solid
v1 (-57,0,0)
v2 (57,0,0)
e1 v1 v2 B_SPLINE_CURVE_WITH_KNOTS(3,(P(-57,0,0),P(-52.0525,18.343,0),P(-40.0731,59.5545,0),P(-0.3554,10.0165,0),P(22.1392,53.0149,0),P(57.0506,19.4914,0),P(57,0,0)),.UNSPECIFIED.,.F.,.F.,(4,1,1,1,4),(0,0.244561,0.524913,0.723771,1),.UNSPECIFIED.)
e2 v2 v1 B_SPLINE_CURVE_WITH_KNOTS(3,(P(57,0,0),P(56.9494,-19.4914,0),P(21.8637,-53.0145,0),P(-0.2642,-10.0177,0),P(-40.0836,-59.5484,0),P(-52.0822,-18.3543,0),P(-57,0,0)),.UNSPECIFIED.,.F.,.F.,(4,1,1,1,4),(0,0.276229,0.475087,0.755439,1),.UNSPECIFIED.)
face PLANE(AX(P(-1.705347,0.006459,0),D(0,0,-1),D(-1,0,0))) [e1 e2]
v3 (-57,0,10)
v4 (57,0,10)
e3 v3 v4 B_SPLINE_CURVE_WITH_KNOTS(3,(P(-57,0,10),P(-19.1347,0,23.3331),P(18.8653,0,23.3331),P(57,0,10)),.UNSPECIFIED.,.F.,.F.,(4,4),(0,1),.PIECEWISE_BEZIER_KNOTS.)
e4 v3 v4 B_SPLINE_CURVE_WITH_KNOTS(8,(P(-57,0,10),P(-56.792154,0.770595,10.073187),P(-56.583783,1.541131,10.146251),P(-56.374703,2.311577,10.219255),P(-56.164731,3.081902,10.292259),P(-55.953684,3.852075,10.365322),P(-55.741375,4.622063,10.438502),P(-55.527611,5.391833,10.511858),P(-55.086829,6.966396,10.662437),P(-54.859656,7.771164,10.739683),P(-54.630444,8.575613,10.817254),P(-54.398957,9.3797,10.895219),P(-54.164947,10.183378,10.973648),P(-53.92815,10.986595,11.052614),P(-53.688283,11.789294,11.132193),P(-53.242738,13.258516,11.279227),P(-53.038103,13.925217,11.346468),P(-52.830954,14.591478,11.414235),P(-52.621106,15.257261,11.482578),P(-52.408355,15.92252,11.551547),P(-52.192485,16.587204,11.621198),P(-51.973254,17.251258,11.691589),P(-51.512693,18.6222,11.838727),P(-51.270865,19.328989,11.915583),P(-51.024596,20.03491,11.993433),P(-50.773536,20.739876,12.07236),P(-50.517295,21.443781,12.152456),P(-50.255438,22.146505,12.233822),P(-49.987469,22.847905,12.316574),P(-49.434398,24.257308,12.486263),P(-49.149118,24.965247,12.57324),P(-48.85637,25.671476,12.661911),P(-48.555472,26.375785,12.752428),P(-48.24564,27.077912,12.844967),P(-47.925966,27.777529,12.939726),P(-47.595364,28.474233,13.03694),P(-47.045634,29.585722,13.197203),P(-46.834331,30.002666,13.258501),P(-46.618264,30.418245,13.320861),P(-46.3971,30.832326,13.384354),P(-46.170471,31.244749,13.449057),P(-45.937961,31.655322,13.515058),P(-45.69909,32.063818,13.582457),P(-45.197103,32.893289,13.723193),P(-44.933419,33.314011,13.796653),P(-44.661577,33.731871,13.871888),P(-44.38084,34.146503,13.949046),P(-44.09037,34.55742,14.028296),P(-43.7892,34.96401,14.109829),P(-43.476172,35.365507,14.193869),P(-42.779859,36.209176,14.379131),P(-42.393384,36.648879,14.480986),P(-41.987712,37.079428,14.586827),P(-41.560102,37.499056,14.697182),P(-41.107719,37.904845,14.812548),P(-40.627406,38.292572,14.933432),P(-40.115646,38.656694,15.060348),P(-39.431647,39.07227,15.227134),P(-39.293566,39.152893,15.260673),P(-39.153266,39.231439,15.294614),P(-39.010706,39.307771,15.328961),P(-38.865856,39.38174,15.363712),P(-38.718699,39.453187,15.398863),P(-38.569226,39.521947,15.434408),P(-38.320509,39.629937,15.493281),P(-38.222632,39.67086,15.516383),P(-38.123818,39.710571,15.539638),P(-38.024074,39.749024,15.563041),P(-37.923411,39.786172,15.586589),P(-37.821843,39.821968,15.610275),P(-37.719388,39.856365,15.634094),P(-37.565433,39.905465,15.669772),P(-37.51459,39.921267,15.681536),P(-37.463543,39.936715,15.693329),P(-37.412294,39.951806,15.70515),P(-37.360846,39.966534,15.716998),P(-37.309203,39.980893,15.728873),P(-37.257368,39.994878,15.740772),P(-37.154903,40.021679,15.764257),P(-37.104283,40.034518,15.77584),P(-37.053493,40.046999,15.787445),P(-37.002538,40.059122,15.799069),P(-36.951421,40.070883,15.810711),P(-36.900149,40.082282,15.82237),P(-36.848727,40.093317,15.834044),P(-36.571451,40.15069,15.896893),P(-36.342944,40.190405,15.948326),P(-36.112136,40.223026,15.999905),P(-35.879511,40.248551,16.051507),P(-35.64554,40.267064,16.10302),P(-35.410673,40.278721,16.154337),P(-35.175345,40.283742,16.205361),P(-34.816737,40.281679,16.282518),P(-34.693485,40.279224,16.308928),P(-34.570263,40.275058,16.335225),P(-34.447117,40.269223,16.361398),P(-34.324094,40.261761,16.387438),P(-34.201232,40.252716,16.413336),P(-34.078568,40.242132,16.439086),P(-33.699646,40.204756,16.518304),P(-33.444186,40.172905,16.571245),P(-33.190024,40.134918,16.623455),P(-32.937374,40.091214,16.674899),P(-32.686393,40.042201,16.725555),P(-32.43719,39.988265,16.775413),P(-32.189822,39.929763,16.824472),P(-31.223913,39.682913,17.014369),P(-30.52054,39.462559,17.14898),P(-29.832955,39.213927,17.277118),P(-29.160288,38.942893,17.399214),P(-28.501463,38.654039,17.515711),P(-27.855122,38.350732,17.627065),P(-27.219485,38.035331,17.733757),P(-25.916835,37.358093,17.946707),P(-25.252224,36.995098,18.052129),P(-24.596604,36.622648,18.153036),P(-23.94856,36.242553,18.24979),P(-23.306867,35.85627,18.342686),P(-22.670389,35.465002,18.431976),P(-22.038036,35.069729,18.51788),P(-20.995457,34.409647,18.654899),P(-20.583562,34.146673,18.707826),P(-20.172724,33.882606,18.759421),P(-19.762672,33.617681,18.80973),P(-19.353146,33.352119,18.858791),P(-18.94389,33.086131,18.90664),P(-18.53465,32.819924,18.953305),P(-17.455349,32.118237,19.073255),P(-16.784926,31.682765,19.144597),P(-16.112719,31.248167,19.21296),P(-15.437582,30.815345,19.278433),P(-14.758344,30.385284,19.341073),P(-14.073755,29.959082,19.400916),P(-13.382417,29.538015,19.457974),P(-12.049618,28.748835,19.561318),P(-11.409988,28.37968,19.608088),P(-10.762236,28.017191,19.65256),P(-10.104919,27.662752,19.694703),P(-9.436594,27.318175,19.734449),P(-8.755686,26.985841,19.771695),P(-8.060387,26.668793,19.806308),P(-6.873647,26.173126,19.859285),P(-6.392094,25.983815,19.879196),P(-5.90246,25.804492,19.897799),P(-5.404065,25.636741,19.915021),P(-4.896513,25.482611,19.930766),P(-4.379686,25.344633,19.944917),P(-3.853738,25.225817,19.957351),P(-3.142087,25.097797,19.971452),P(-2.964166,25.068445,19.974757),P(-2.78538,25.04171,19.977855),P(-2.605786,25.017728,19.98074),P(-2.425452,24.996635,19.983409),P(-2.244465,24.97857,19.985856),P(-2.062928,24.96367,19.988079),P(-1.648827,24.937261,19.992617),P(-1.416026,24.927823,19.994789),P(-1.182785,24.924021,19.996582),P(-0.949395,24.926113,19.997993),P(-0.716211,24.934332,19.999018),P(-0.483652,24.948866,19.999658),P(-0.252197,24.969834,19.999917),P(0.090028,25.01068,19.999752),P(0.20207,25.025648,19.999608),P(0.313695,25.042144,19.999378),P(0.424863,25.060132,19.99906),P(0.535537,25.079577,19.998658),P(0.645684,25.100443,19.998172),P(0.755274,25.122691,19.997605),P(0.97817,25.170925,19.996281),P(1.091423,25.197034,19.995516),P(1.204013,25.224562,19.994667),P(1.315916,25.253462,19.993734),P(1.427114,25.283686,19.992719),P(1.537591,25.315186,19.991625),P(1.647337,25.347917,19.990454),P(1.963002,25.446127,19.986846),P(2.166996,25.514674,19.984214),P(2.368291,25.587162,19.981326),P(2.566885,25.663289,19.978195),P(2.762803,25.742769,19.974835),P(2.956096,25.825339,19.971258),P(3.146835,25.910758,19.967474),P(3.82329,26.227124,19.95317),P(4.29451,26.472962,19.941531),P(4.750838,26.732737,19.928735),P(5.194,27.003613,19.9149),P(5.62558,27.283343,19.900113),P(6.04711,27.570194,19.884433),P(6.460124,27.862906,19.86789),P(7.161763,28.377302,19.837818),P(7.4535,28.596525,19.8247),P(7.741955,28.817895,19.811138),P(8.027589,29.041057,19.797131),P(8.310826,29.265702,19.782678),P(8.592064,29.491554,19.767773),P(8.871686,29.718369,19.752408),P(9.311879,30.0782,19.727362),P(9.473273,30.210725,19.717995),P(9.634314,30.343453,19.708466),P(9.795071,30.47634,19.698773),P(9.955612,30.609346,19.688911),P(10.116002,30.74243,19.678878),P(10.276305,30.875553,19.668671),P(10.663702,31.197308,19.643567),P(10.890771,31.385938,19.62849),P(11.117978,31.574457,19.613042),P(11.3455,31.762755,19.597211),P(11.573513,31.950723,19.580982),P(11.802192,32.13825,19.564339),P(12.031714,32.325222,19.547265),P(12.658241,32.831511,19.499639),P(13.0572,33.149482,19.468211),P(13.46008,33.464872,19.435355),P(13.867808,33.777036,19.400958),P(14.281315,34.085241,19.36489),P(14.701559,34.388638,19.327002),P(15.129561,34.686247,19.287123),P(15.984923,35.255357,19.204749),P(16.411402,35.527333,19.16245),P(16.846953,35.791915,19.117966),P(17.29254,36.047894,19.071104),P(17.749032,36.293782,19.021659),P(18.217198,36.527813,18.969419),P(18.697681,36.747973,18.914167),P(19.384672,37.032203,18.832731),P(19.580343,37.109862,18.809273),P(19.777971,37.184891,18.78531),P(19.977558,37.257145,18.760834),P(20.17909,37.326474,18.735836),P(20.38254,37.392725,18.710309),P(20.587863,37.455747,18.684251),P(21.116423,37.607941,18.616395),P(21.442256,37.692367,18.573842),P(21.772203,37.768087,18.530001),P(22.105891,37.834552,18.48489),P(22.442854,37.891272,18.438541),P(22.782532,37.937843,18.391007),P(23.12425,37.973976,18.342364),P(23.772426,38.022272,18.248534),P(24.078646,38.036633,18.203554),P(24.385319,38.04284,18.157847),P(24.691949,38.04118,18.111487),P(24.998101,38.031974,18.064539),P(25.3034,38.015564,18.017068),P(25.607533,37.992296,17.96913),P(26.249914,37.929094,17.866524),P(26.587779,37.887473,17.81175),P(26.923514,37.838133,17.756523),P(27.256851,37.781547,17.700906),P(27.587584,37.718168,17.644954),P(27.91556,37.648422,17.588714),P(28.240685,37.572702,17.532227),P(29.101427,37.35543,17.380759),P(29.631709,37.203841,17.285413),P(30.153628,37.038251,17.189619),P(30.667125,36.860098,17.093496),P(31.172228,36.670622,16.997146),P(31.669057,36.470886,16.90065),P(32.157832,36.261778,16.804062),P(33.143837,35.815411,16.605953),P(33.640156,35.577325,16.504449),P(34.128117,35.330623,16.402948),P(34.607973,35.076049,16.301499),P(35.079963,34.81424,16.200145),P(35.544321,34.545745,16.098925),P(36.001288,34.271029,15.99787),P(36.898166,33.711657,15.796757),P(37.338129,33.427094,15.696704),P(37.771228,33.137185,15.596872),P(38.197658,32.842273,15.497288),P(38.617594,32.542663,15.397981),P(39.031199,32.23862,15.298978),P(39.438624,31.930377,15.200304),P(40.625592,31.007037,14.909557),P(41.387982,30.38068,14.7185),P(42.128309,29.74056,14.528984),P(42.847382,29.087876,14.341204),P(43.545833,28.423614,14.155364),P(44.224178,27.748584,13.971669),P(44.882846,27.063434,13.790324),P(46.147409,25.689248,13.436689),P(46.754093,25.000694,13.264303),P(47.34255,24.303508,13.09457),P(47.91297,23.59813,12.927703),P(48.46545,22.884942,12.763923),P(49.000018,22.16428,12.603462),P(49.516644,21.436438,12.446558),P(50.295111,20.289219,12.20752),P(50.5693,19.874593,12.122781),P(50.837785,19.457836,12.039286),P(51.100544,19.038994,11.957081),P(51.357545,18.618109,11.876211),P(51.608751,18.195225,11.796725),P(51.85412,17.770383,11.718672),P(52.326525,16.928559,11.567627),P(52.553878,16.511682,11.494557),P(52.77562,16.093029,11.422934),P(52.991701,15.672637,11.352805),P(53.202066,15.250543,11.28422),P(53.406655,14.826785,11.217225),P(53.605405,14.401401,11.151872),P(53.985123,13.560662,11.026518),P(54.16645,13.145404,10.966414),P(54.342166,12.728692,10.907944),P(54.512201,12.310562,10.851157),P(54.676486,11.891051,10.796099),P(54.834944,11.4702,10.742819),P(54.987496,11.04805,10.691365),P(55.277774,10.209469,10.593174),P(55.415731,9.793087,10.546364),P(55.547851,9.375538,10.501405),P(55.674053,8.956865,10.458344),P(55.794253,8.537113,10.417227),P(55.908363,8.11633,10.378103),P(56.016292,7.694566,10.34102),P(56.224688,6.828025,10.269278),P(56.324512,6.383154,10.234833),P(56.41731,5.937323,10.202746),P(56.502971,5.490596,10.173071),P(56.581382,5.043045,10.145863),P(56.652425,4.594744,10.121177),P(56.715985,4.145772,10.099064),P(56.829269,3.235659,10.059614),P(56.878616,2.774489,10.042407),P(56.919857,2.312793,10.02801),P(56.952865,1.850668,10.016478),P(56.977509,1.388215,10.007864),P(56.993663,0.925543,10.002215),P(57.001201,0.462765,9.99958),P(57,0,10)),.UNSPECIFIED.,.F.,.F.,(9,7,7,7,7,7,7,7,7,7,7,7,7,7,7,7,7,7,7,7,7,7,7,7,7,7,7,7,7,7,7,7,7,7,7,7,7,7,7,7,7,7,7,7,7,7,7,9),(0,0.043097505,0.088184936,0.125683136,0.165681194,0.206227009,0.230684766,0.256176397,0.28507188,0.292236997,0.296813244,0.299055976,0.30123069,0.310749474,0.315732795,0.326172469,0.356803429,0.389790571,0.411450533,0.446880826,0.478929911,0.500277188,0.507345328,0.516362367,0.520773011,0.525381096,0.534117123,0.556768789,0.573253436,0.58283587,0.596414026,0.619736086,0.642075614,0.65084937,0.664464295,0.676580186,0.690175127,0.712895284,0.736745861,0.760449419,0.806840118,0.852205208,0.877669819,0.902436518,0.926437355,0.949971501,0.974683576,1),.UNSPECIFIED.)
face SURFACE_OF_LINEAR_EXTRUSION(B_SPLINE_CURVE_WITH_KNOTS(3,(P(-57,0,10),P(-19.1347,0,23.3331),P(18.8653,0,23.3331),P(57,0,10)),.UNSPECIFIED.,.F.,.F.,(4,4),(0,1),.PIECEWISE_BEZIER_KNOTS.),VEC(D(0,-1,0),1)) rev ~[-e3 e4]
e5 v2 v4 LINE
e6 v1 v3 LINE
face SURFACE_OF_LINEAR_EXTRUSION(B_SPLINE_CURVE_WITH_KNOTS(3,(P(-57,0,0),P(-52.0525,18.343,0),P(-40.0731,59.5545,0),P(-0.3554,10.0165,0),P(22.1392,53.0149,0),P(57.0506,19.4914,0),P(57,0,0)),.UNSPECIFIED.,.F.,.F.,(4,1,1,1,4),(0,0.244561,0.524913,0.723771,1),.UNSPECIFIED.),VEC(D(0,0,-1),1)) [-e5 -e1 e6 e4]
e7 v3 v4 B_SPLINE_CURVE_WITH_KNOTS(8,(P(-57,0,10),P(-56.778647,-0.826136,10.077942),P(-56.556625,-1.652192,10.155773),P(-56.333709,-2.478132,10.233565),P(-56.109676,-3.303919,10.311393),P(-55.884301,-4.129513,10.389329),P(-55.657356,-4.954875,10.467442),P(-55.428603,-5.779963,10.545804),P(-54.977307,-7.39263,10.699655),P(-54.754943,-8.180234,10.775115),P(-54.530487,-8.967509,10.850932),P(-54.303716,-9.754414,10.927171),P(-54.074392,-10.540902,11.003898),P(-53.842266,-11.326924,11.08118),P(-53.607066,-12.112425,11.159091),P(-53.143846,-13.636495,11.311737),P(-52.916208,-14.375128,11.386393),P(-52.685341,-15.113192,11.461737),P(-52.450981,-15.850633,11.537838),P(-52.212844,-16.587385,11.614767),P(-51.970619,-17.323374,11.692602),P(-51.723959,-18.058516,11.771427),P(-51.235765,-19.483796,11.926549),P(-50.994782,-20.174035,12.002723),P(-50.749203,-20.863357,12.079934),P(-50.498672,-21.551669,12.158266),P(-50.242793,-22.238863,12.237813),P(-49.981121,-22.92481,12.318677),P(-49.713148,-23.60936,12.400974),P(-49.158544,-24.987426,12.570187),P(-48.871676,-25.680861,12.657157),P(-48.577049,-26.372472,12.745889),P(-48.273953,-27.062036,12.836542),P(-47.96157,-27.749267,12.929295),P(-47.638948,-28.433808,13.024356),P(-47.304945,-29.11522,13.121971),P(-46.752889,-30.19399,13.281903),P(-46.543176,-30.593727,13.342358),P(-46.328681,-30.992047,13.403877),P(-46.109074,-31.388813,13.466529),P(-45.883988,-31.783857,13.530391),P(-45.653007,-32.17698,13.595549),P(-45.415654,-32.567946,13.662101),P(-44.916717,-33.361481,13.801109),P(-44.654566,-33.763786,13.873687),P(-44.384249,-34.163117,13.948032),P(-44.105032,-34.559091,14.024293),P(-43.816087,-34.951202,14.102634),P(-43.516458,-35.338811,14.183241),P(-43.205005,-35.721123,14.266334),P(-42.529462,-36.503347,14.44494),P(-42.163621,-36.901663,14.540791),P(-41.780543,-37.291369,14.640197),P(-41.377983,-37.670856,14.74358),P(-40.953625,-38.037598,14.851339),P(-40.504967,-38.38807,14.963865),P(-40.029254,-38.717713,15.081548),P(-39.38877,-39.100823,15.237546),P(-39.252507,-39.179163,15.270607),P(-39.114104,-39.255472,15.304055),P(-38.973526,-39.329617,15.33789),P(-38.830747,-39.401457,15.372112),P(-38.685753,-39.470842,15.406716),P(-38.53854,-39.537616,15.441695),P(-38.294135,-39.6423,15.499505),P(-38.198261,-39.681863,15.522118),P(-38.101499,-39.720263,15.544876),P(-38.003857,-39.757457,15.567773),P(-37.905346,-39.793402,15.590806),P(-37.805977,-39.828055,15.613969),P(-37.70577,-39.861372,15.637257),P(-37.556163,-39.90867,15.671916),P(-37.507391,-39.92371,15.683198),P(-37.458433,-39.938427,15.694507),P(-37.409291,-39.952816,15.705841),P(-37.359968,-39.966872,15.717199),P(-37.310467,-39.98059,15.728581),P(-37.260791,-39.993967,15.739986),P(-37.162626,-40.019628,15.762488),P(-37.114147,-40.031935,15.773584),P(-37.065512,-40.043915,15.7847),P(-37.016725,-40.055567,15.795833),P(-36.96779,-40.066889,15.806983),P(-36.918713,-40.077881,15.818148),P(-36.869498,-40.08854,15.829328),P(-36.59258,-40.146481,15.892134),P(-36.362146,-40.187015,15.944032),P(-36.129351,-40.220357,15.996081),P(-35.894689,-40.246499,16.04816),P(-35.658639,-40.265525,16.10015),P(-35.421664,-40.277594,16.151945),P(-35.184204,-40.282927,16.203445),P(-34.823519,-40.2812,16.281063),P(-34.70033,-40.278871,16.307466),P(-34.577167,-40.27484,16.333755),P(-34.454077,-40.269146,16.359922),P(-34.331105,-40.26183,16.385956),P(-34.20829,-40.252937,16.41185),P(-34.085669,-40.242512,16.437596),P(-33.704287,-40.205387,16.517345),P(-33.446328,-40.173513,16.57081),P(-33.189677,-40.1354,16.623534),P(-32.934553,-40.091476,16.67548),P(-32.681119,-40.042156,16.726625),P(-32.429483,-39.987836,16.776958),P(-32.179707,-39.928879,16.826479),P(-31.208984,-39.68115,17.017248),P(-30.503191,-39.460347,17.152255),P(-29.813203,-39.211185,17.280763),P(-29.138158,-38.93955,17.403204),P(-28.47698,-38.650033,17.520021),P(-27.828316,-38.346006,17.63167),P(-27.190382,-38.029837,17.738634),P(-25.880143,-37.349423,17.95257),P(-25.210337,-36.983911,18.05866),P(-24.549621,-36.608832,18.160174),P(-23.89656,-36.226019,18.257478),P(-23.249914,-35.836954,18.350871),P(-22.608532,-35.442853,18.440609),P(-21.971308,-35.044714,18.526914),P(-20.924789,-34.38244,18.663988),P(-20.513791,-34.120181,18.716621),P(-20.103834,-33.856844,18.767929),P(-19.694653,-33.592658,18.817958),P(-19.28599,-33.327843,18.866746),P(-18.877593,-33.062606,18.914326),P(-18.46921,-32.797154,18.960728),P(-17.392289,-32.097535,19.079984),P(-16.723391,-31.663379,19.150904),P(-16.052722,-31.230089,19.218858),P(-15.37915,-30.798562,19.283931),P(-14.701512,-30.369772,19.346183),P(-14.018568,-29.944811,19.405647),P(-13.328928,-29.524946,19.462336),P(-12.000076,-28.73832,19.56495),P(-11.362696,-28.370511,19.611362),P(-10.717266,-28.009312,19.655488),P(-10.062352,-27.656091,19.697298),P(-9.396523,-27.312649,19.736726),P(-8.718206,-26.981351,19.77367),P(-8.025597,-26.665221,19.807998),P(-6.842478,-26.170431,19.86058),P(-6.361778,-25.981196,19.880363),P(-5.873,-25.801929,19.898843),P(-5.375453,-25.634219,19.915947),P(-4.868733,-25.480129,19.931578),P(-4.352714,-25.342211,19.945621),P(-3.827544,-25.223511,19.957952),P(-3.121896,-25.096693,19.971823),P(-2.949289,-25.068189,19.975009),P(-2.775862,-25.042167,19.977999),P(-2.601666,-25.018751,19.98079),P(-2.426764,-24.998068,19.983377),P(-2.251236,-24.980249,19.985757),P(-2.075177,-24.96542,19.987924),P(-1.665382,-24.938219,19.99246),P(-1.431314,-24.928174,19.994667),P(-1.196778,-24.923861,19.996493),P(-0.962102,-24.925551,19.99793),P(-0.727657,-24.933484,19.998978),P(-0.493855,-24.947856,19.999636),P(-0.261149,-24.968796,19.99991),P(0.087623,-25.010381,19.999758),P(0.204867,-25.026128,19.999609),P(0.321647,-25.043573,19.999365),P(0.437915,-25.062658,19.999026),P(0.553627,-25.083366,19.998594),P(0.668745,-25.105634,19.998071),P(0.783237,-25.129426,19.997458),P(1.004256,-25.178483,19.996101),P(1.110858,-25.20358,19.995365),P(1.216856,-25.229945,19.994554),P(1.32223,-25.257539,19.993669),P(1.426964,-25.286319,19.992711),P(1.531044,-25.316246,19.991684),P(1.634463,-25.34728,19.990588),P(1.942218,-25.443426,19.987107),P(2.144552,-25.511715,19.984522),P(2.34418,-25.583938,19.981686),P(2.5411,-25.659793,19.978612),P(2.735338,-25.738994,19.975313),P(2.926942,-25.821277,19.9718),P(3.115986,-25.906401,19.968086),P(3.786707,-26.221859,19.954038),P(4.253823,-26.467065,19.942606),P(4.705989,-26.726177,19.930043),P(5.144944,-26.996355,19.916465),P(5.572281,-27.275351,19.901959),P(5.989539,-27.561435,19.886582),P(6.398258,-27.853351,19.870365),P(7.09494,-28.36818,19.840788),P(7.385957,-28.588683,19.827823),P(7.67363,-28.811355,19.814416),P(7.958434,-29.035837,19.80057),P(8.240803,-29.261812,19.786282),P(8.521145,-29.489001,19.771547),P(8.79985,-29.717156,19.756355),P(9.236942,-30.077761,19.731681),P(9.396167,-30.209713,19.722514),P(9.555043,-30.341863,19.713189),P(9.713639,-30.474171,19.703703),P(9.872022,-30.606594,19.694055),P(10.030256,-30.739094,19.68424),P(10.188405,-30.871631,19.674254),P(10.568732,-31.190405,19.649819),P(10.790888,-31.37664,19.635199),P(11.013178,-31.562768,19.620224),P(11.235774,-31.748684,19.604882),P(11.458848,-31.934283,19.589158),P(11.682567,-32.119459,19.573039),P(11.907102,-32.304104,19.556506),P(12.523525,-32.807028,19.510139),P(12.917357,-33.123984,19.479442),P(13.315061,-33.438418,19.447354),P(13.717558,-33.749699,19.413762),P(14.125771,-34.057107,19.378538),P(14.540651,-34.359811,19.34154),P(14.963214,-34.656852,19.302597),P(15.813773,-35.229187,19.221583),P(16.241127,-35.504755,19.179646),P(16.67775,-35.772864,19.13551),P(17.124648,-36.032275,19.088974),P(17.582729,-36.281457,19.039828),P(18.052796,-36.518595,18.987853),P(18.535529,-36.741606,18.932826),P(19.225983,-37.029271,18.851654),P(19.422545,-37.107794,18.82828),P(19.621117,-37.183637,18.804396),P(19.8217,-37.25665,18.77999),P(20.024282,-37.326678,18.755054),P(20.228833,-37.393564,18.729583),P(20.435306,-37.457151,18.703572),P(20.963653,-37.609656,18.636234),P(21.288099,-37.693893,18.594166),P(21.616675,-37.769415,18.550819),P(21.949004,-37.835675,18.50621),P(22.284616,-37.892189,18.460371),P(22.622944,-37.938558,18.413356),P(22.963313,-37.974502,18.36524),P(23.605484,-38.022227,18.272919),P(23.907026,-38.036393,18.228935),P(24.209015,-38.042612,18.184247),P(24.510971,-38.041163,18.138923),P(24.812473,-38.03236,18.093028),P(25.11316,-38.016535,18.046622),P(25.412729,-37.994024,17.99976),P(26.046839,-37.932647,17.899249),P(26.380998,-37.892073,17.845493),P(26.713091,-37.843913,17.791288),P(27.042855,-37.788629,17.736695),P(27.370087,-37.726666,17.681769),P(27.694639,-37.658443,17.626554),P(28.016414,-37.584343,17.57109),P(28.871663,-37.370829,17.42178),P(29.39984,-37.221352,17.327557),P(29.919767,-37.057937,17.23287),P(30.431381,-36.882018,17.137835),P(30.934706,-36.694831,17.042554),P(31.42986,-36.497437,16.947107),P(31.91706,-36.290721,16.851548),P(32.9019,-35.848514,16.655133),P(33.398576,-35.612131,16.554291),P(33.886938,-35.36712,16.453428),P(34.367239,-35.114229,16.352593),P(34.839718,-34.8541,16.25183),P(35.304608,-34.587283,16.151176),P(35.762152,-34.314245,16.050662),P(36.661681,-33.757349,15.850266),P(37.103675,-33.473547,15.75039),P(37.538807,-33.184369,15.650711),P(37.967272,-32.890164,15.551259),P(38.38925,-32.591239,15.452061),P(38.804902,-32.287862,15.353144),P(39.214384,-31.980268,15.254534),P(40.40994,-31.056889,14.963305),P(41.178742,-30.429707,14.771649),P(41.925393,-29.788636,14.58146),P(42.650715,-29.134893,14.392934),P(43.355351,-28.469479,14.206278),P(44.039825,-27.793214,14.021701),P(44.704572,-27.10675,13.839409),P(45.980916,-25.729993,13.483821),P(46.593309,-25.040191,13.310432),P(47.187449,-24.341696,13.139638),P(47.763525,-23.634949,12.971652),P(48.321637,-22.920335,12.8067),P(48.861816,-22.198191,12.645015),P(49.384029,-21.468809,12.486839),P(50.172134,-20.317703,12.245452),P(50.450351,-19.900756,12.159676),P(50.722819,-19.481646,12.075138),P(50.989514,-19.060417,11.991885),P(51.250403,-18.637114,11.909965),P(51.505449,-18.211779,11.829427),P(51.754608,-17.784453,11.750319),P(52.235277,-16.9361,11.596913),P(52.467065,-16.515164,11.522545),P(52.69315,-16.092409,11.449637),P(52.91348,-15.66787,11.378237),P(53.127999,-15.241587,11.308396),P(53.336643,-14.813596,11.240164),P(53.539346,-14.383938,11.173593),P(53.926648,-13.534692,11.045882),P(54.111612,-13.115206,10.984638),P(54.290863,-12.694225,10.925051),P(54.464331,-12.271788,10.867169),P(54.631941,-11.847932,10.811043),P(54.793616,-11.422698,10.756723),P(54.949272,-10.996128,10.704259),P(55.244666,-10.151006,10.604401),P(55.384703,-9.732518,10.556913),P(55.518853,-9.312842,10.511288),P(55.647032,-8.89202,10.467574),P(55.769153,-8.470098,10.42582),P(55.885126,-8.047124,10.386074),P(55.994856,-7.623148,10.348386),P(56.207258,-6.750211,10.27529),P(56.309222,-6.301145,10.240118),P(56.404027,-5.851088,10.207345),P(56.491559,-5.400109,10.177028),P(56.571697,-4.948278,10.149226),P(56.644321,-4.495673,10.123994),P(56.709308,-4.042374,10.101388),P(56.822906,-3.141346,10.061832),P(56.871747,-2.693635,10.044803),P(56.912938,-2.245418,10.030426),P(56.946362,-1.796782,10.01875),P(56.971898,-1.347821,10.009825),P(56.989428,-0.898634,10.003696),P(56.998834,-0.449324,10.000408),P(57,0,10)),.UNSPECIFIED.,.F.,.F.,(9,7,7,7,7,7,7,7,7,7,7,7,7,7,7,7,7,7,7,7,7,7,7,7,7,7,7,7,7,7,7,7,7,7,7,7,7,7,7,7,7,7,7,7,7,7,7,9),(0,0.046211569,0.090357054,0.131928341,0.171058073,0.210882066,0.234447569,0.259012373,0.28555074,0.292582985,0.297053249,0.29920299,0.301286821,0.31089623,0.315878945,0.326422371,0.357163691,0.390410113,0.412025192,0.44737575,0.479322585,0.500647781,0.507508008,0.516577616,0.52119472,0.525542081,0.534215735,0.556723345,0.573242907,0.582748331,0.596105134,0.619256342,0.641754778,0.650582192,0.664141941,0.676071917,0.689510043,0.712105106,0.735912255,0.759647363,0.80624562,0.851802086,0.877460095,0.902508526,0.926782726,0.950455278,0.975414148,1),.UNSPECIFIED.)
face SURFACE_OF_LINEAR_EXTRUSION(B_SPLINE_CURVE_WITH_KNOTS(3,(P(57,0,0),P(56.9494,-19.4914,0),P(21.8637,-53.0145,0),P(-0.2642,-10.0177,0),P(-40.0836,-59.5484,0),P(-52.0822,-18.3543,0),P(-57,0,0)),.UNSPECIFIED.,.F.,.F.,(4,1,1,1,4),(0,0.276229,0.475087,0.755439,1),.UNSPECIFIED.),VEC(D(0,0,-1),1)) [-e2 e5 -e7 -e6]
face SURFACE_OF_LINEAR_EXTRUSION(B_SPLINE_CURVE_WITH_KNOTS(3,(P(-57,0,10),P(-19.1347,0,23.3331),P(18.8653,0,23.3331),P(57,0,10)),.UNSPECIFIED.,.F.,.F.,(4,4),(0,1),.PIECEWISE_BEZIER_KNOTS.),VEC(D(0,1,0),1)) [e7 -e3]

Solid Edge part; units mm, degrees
sketch "Sketch1" plane through (0, 0, 0) normal (0, 0, 1) x (1, 0, 0)
  spline S0 degree 3 poles (-57, 0) (-52.0525, 18.343) (-40.0731, 59.5545) (-0.3554, 10.0165) (22.1392, 53.0149) (57.0506, 19.4914) (57, 0) knots 0 0 0 0 0.244561 0.524913 0.723771 1 1 1 1
  spline S1 degree 3 poles (57, 0) (56.9494, -19.4914) (21.8637, -53.0145) (-0.2642, -10.0177) (-40.0836, -59.5484) (-52.0822, -18.3543) (-57, 0) knots 0 0 0 0 0.276229 0.475087 0.755439 1 1 1 1
extrude "Protrusion1" add sketch "Sketch1" along normal blind 20
sketch "Sketch2" plane through (0, 0, 0) normal (0, -1, 0) x (1, 0, 0)
  spline S0 degree 3 poles (-57, 10) (-19.1347, 23.3331) (18.8653, 23.3331) (57, 10) knots 0 0 0 0 1 1 1 1
extrude "ExtrudedCutout_3" cut sketch "Sketch2" against normal blind 64.0894 material side at (-0.0029, 0, 20.0498)
sketch "Sketch3" plane through (0, 0, 0) normal (0, -1, 0) x (1, 0, 0)
  spline S0 degree 3 poles (-57, 10) (-19.1347, 23.3331) (18.8653, 23.3331) (57, 10) knots 0 0 0 0 1 1 1 1
extrude "ExtrudedCutout_4" cut sketch "Sketch3" along normal blind 66.1017 material side at (-0.0029, 0, 20.0498)
